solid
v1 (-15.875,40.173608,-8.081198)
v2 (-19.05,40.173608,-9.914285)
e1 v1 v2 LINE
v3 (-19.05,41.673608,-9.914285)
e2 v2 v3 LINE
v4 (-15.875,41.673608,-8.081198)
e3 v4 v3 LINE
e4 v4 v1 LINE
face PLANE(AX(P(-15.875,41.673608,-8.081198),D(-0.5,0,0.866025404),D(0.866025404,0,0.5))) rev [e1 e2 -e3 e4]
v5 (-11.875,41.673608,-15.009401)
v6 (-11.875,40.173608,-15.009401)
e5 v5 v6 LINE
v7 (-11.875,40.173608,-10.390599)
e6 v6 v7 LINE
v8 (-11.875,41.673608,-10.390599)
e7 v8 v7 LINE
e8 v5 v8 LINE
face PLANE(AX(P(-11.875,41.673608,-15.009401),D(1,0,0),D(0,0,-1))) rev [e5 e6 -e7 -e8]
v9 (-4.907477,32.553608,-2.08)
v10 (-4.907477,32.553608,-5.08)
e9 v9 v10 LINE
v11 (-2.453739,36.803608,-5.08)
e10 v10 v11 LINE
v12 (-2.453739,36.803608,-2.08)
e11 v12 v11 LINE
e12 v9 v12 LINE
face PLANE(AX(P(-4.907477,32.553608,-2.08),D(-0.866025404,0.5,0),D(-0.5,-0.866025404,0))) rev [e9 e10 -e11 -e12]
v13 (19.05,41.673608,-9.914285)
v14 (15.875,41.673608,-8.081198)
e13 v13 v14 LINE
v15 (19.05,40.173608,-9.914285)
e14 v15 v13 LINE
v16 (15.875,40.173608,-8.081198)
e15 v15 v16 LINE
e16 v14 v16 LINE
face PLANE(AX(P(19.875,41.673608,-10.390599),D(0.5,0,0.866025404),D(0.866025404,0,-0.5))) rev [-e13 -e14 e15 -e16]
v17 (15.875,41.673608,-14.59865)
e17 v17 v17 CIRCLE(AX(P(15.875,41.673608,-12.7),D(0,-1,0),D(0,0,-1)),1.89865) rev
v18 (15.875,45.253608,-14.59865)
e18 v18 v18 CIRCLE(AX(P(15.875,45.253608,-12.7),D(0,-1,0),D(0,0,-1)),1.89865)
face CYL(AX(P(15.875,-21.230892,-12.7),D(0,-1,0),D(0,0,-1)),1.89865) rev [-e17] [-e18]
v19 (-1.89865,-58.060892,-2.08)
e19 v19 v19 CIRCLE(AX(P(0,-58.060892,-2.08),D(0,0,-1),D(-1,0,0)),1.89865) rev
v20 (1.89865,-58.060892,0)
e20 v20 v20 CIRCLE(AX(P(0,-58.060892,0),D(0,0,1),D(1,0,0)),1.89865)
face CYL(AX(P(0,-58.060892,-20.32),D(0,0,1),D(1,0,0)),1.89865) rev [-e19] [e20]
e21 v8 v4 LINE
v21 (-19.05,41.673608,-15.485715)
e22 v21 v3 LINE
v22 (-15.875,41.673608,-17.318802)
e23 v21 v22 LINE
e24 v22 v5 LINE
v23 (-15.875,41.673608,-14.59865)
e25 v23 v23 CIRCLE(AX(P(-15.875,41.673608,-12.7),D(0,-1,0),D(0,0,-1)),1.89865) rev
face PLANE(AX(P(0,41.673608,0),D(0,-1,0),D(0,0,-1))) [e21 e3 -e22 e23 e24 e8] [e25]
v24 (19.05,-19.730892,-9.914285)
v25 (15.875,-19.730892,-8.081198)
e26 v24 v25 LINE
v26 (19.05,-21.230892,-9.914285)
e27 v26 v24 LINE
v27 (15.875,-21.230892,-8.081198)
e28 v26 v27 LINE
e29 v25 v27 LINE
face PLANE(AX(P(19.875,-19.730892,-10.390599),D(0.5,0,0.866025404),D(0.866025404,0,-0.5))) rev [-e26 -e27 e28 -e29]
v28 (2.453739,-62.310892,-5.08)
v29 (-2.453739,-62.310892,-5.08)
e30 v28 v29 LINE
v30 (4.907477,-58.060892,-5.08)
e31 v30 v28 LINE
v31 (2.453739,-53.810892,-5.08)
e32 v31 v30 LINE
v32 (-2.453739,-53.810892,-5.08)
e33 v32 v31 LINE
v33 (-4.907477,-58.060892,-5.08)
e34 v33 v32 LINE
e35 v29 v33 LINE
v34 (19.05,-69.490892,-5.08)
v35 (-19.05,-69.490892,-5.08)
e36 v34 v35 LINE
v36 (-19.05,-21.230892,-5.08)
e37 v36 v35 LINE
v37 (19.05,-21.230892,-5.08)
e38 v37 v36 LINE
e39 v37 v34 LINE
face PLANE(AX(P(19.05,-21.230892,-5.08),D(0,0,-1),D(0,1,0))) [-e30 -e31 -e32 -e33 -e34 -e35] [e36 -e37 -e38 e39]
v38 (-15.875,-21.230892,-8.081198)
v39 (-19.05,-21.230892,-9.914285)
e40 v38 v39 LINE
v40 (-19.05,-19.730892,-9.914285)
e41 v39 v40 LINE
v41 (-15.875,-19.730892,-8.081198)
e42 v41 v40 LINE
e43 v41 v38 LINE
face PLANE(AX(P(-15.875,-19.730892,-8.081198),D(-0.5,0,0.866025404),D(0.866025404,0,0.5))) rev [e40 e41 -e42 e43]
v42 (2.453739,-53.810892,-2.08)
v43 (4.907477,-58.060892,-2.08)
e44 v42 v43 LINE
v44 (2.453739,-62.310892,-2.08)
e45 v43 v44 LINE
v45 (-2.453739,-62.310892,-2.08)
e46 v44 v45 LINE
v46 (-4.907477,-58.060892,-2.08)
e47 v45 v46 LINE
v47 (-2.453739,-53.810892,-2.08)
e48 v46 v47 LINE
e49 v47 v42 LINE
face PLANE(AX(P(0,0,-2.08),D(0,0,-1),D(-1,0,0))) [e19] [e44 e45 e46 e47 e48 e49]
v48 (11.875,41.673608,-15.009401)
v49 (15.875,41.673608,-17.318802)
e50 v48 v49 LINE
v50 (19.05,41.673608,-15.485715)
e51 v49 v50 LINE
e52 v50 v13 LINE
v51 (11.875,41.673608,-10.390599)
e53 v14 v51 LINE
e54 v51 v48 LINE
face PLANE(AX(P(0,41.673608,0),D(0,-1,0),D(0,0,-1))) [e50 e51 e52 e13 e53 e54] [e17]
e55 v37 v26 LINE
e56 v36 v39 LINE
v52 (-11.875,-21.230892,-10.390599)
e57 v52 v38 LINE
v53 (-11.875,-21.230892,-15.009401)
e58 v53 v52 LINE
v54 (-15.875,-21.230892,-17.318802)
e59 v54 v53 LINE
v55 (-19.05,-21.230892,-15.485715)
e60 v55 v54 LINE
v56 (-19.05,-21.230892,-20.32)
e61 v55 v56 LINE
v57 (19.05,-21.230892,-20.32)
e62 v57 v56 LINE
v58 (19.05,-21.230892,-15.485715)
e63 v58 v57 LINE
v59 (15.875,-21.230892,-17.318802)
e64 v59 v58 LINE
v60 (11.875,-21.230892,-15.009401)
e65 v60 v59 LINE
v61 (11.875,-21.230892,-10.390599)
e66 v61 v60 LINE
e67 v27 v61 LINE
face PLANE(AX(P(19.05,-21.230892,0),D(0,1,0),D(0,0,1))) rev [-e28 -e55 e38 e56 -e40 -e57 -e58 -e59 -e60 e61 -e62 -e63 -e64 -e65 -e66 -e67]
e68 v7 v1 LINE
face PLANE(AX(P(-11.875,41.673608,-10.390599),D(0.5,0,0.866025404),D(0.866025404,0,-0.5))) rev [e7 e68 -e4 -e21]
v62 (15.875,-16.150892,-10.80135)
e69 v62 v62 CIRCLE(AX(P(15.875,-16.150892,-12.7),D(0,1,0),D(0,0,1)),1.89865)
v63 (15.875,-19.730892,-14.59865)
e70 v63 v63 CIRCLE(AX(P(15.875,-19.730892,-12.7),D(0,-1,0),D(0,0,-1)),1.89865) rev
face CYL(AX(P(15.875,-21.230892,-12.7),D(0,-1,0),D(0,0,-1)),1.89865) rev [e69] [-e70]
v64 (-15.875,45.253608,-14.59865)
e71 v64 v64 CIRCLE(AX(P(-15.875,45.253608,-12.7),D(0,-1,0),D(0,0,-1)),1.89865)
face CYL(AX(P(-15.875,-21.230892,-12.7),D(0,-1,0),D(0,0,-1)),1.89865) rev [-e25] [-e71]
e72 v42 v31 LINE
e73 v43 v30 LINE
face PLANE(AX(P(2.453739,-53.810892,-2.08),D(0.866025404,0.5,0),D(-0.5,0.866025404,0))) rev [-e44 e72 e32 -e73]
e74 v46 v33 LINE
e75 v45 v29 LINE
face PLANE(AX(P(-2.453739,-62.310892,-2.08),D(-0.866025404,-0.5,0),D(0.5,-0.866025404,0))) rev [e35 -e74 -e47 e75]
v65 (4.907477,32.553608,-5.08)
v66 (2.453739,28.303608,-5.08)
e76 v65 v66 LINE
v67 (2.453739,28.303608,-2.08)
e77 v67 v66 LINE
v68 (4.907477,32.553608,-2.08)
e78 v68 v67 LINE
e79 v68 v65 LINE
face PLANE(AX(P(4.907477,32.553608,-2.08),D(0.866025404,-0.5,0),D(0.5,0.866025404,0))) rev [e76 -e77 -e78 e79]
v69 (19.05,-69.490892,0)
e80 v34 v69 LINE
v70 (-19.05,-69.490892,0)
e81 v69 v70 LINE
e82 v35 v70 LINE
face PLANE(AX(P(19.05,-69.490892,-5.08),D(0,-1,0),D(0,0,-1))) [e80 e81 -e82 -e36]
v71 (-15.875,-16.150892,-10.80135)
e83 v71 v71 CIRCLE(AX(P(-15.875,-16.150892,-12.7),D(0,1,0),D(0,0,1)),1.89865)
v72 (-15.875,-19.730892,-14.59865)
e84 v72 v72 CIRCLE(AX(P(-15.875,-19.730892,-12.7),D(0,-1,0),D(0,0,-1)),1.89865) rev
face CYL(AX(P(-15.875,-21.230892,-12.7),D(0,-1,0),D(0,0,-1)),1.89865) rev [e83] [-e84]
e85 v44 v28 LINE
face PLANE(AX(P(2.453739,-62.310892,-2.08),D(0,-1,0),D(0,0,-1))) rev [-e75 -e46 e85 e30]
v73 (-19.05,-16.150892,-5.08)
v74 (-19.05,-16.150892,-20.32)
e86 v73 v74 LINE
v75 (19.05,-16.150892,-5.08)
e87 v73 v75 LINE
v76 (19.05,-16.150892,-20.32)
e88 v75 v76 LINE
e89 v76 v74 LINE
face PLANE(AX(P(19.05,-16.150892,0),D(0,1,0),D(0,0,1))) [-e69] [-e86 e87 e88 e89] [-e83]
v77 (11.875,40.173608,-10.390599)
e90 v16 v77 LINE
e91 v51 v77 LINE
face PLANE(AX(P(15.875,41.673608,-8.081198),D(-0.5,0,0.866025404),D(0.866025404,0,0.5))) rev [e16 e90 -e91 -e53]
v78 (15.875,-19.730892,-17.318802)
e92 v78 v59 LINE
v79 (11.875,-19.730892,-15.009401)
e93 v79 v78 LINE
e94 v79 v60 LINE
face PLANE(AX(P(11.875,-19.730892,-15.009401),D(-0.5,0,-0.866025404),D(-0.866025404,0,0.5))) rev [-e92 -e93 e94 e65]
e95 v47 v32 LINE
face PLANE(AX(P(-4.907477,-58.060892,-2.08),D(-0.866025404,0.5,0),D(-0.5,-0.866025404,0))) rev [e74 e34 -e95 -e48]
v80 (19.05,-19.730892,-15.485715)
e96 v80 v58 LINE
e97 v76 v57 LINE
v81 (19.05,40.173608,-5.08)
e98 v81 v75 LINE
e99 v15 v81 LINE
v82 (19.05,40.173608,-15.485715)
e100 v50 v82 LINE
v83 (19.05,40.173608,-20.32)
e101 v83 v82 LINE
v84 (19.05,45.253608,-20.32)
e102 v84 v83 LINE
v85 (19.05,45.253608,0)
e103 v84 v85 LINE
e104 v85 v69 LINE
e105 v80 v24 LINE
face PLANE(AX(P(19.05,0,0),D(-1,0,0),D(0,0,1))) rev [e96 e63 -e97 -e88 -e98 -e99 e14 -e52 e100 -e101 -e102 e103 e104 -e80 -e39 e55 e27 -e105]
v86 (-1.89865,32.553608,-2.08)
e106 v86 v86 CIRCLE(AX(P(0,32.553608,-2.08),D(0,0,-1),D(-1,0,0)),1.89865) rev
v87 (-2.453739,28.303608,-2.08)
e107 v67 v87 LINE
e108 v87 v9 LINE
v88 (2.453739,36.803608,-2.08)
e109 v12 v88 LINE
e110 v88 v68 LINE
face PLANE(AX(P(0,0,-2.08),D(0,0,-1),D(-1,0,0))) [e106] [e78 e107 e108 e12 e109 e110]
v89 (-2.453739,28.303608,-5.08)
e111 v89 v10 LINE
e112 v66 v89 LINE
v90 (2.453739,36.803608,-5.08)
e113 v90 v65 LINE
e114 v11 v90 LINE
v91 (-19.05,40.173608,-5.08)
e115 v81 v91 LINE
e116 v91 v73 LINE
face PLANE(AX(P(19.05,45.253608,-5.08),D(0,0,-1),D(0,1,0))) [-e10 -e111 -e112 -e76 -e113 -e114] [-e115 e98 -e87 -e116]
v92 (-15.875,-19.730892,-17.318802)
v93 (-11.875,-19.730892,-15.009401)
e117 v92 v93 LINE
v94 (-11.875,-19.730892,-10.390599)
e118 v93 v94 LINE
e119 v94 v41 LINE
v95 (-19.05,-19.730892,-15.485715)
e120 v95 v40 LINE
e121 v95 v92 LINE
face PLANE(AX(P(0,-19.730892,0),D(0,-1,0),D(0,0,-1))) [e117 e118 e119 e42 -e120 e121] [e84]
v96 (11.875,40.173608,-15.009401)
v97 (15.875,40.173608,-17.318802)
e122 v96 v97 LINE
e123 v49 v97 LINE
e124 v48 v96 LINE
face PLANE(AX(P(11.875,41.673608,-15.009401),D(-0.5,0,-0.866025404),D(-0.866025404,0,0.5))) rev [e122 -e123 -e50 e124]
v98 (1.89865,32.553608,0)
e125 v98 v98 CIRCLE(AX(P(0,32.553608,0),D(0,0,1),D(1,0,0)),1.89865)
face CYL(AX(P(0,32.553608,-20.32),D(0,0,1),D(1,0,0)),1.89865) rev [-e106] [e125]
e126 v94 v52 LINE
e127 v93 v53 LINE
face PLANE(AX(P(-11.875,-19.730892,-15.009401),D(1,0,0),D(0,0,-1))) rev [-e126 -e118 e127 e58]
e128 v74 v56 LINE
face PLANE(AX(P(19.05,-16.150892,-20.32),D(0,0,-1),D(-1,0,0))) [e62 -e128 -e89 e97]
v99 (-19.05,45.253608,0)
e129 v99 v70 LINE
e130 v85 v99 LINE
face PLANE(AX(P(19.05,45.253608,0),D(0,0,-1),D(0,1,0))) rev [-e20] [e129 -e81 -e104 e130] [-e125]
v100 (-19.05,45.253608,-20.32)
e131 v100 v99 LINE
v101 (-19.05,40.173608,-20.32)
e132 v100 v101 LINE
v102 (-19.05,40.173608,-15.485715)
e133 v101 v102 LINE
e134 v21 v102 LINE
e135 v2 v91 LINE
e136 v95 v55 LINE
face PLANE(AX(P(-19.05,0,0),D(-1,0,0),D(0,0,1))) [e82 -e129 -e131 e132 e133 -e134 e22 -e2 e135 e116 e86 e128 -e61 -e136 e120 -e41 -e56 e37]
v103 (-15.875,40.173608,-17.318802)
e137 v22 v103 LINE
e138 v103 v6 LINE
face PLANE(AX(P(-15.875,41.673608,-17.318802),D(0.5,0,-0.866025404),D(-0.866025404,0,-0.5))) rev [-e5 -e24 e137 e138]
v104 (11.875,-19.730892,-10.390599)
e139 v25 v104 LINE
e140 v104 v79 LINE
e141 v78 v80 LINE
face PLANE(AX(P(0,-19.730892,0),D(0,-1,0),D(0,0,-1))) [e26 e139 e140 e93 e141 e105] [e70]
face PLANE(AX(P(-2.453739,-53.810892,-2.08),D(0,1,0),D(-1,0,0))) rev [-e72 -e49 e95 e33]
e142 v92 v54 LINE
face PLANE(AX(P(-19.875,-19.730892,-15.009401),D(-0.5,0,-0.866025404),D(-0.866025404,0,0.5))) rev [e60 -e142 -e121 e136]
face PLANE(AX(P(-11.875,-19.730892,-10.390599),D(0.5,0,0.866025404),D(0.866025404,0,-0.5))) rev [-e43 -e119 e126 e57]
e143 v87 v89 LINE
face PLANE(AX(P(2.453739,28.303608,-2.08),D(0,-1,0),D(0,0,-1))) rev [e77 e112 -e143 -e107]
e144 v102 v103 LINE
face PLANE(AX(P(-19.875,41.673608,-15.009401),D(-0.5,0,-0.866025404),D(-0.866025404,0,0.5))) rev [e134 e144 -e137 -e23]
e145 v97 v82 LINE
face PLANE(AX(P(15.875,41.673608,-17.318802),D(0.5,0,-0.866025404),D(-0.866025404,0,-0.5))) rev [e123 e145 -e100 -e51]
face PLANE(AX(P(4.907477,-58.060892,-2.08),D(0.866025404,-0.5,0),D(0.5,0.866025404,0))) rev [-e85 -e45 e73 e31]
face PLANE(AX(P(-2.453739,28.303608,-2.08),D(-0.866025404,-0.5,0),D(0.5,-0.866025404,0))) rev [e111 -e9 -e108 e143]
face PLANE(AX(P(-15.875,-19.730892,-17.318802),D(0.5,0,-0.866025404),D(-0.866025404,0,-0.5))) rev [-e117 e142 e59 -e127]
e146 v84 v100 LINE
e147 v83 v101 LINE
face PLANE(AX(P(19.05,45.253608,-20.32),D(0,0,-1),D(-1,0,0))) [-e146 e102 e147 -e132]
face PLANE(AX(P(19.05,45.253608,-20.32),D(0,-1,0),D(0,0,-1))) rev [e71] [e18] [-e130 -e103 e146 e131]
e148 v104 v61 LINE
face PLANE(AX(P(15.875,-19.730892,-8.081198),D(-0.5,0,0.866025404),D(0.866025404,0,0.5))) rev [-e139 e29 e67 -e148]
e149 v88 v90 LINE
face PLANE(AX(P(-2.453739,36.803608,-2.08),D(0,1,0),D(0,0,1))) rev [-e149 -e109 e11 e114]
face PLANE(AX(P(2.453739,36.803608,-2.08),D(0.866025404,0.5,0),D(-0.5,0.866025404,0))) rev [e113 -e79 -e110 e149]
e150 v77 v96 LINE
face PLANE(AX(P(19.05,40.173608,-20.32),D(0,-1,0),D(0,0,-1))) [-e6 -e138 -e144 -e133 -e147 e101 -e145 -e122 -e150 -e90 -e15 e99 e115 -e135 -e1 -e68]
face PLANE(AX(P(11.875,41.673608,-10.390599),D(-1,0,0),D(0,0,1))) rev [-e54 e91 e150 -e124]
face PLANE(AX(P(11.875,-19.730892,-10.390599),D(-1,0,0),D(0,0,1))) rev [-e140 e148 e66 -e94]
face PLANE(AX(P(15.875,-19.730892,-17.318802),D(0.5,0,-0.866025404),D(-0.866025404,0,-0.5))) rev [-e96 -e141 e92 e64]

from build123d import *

# Parameters (mm, degrees)
EXTRU_MINCE1_START      = -19.05
EXTRU_MINCE1_DEPTH      = 38.1
ESQUISSE3_R             = 1.89865
ENL_V_MAT_EXTRU_2_DEPTH = 75.865138463
D_GAGEMENT_61_D         = 3.7973
ENL_V_MAT_EXTRU_3_DEPTH = 3
ENL_V_MAT_EXTRU_4_DEPTH = 1.5
ENL_V_MAT_EXTRU_5_DEPTH = 1.5


# Read off the part's stored shape, not the designer's step: Extru.-Mince1
with BuildPart() as part:
    # Extru.-Mince1 outline → Extru.-Mince1 (new body)
    with BuildSketch(Plane(origin=(0, 0, 0), x_dir=(0, 0, -1), z_dir=(1, 0, 0)).offset(EXTRU_MINCE1_START)):
        Polygon((20.32, -16.1508919), (5.08, -16.1508919), (5.08, 40.1736081), (20.32, 40.1736081), (20.32, 45.2536081), (0, 45.2536081), (0, -69.4908919), (5.08, -69.4908919), (5.08, -21.2308919), (20.32, -21.2308919), align=None)
    extrude(amount=EXTRU_MINCE1_DEPTH)

    # Esquisse3 → Enlèv. mat.-Extru.2 (cut, through all)
    with BuildSketch(Plane.XY):
        with Locations((0, -58.0608919)):
            Circle(ESQUISSE3_R)
        with Locations((0, 32.5536081)):
            Circle(ESQUISSE3_R)
    extrude(amount=-ENL_V_MAT_EXTRU_2_DEPTH, mode=Mode.SUBTRACT)

    # Dégagement #61 (through all)
    with Locations(Plane(origin=(0, -21.2308919, 0), x_dir=(-1, 0, 0), z_dir=(0, -1, 0))):
        with Locations((-15.875, 12.7), (15.875, 12.7)):
            Hole(D_GAGEMENT_61_D / 2)

    # Esquisse10 → Enlèv. mat.-Extru.3 (cut)
    with BuildSketch(Plane(origin=(0, 0, -5.08), x_dir=(-1, 0, 0), z_dir=(0, 0, -1))):
        Polygon((2.453738644, 36.8036081), (-2.453738644, 36.8036081), (-4.907477288, 32.5536081), (-2.453738644, 28.3036081), (2.453738644, 28.3036081), (4.907477288, 32.5536081), align=None)
        Polygon((2.453738644, -53.8108919), (-2.453738644, -53.8108919), (-4.907477288, -58.0608919), (-2.453738644, -62.3108919), (2.453738644, -62.3108919), (4.907477288, -58.0608919), align=None)
    extrude(amount=-ENL_V_MAT_EXTRU_3_DEPTH, mode=Mode.SUBTRACT)

    # Esquisse12 → Enlèv. mat.-Extru.4 (cut)
    with BuildSketch(Plane.XZ.offset(21.2308919)):
        Polygon((11.875, -10.390598923), (11.875, -15.009401077), (15.875, -17.318802154), (19.875, -15.009401077), (19.875, -10.390598923), (15.875, -8.081197846), align=None)
        Polygon((-19.875, -10.390598923), (-19.875, -15.009401077), (-15.875, -17.318802154), (-11.875, -15.009401077), (-11.875, -10.390598923), (-15.875, -8.081197846), align=None)
    extrude(amount=-ENL_V_MAT_EXTRU_4_DEPTH, mode=Mode.SUBTRACT)

    # Esquisse13 → Enlèv. mat.-Extru.5 (cut)
    with BuildSketch(Plane.XZ.offset(-40.1736081)):
        Polygon((-11.875, -15.009401077), (-11.875, -10.390598923), (-15.875, -8.081197846), (-19.875, -10.390598923), (-19.875, -15.009401077), (-15.875, -17.318802154), align=None)
        Polygon((15.875, -8.081197846), (11.875, -10.390598923), (11.875, -15.009401077), (15.875, -17.318802154), (19.875, -15.009401077), (19.875, -10.390598923), align=None)
    extrude(amount=-ENL_V_MAT_EXTRU_5_DEPTH, mode=Mode.SUBTRACT)


solid = part.part
